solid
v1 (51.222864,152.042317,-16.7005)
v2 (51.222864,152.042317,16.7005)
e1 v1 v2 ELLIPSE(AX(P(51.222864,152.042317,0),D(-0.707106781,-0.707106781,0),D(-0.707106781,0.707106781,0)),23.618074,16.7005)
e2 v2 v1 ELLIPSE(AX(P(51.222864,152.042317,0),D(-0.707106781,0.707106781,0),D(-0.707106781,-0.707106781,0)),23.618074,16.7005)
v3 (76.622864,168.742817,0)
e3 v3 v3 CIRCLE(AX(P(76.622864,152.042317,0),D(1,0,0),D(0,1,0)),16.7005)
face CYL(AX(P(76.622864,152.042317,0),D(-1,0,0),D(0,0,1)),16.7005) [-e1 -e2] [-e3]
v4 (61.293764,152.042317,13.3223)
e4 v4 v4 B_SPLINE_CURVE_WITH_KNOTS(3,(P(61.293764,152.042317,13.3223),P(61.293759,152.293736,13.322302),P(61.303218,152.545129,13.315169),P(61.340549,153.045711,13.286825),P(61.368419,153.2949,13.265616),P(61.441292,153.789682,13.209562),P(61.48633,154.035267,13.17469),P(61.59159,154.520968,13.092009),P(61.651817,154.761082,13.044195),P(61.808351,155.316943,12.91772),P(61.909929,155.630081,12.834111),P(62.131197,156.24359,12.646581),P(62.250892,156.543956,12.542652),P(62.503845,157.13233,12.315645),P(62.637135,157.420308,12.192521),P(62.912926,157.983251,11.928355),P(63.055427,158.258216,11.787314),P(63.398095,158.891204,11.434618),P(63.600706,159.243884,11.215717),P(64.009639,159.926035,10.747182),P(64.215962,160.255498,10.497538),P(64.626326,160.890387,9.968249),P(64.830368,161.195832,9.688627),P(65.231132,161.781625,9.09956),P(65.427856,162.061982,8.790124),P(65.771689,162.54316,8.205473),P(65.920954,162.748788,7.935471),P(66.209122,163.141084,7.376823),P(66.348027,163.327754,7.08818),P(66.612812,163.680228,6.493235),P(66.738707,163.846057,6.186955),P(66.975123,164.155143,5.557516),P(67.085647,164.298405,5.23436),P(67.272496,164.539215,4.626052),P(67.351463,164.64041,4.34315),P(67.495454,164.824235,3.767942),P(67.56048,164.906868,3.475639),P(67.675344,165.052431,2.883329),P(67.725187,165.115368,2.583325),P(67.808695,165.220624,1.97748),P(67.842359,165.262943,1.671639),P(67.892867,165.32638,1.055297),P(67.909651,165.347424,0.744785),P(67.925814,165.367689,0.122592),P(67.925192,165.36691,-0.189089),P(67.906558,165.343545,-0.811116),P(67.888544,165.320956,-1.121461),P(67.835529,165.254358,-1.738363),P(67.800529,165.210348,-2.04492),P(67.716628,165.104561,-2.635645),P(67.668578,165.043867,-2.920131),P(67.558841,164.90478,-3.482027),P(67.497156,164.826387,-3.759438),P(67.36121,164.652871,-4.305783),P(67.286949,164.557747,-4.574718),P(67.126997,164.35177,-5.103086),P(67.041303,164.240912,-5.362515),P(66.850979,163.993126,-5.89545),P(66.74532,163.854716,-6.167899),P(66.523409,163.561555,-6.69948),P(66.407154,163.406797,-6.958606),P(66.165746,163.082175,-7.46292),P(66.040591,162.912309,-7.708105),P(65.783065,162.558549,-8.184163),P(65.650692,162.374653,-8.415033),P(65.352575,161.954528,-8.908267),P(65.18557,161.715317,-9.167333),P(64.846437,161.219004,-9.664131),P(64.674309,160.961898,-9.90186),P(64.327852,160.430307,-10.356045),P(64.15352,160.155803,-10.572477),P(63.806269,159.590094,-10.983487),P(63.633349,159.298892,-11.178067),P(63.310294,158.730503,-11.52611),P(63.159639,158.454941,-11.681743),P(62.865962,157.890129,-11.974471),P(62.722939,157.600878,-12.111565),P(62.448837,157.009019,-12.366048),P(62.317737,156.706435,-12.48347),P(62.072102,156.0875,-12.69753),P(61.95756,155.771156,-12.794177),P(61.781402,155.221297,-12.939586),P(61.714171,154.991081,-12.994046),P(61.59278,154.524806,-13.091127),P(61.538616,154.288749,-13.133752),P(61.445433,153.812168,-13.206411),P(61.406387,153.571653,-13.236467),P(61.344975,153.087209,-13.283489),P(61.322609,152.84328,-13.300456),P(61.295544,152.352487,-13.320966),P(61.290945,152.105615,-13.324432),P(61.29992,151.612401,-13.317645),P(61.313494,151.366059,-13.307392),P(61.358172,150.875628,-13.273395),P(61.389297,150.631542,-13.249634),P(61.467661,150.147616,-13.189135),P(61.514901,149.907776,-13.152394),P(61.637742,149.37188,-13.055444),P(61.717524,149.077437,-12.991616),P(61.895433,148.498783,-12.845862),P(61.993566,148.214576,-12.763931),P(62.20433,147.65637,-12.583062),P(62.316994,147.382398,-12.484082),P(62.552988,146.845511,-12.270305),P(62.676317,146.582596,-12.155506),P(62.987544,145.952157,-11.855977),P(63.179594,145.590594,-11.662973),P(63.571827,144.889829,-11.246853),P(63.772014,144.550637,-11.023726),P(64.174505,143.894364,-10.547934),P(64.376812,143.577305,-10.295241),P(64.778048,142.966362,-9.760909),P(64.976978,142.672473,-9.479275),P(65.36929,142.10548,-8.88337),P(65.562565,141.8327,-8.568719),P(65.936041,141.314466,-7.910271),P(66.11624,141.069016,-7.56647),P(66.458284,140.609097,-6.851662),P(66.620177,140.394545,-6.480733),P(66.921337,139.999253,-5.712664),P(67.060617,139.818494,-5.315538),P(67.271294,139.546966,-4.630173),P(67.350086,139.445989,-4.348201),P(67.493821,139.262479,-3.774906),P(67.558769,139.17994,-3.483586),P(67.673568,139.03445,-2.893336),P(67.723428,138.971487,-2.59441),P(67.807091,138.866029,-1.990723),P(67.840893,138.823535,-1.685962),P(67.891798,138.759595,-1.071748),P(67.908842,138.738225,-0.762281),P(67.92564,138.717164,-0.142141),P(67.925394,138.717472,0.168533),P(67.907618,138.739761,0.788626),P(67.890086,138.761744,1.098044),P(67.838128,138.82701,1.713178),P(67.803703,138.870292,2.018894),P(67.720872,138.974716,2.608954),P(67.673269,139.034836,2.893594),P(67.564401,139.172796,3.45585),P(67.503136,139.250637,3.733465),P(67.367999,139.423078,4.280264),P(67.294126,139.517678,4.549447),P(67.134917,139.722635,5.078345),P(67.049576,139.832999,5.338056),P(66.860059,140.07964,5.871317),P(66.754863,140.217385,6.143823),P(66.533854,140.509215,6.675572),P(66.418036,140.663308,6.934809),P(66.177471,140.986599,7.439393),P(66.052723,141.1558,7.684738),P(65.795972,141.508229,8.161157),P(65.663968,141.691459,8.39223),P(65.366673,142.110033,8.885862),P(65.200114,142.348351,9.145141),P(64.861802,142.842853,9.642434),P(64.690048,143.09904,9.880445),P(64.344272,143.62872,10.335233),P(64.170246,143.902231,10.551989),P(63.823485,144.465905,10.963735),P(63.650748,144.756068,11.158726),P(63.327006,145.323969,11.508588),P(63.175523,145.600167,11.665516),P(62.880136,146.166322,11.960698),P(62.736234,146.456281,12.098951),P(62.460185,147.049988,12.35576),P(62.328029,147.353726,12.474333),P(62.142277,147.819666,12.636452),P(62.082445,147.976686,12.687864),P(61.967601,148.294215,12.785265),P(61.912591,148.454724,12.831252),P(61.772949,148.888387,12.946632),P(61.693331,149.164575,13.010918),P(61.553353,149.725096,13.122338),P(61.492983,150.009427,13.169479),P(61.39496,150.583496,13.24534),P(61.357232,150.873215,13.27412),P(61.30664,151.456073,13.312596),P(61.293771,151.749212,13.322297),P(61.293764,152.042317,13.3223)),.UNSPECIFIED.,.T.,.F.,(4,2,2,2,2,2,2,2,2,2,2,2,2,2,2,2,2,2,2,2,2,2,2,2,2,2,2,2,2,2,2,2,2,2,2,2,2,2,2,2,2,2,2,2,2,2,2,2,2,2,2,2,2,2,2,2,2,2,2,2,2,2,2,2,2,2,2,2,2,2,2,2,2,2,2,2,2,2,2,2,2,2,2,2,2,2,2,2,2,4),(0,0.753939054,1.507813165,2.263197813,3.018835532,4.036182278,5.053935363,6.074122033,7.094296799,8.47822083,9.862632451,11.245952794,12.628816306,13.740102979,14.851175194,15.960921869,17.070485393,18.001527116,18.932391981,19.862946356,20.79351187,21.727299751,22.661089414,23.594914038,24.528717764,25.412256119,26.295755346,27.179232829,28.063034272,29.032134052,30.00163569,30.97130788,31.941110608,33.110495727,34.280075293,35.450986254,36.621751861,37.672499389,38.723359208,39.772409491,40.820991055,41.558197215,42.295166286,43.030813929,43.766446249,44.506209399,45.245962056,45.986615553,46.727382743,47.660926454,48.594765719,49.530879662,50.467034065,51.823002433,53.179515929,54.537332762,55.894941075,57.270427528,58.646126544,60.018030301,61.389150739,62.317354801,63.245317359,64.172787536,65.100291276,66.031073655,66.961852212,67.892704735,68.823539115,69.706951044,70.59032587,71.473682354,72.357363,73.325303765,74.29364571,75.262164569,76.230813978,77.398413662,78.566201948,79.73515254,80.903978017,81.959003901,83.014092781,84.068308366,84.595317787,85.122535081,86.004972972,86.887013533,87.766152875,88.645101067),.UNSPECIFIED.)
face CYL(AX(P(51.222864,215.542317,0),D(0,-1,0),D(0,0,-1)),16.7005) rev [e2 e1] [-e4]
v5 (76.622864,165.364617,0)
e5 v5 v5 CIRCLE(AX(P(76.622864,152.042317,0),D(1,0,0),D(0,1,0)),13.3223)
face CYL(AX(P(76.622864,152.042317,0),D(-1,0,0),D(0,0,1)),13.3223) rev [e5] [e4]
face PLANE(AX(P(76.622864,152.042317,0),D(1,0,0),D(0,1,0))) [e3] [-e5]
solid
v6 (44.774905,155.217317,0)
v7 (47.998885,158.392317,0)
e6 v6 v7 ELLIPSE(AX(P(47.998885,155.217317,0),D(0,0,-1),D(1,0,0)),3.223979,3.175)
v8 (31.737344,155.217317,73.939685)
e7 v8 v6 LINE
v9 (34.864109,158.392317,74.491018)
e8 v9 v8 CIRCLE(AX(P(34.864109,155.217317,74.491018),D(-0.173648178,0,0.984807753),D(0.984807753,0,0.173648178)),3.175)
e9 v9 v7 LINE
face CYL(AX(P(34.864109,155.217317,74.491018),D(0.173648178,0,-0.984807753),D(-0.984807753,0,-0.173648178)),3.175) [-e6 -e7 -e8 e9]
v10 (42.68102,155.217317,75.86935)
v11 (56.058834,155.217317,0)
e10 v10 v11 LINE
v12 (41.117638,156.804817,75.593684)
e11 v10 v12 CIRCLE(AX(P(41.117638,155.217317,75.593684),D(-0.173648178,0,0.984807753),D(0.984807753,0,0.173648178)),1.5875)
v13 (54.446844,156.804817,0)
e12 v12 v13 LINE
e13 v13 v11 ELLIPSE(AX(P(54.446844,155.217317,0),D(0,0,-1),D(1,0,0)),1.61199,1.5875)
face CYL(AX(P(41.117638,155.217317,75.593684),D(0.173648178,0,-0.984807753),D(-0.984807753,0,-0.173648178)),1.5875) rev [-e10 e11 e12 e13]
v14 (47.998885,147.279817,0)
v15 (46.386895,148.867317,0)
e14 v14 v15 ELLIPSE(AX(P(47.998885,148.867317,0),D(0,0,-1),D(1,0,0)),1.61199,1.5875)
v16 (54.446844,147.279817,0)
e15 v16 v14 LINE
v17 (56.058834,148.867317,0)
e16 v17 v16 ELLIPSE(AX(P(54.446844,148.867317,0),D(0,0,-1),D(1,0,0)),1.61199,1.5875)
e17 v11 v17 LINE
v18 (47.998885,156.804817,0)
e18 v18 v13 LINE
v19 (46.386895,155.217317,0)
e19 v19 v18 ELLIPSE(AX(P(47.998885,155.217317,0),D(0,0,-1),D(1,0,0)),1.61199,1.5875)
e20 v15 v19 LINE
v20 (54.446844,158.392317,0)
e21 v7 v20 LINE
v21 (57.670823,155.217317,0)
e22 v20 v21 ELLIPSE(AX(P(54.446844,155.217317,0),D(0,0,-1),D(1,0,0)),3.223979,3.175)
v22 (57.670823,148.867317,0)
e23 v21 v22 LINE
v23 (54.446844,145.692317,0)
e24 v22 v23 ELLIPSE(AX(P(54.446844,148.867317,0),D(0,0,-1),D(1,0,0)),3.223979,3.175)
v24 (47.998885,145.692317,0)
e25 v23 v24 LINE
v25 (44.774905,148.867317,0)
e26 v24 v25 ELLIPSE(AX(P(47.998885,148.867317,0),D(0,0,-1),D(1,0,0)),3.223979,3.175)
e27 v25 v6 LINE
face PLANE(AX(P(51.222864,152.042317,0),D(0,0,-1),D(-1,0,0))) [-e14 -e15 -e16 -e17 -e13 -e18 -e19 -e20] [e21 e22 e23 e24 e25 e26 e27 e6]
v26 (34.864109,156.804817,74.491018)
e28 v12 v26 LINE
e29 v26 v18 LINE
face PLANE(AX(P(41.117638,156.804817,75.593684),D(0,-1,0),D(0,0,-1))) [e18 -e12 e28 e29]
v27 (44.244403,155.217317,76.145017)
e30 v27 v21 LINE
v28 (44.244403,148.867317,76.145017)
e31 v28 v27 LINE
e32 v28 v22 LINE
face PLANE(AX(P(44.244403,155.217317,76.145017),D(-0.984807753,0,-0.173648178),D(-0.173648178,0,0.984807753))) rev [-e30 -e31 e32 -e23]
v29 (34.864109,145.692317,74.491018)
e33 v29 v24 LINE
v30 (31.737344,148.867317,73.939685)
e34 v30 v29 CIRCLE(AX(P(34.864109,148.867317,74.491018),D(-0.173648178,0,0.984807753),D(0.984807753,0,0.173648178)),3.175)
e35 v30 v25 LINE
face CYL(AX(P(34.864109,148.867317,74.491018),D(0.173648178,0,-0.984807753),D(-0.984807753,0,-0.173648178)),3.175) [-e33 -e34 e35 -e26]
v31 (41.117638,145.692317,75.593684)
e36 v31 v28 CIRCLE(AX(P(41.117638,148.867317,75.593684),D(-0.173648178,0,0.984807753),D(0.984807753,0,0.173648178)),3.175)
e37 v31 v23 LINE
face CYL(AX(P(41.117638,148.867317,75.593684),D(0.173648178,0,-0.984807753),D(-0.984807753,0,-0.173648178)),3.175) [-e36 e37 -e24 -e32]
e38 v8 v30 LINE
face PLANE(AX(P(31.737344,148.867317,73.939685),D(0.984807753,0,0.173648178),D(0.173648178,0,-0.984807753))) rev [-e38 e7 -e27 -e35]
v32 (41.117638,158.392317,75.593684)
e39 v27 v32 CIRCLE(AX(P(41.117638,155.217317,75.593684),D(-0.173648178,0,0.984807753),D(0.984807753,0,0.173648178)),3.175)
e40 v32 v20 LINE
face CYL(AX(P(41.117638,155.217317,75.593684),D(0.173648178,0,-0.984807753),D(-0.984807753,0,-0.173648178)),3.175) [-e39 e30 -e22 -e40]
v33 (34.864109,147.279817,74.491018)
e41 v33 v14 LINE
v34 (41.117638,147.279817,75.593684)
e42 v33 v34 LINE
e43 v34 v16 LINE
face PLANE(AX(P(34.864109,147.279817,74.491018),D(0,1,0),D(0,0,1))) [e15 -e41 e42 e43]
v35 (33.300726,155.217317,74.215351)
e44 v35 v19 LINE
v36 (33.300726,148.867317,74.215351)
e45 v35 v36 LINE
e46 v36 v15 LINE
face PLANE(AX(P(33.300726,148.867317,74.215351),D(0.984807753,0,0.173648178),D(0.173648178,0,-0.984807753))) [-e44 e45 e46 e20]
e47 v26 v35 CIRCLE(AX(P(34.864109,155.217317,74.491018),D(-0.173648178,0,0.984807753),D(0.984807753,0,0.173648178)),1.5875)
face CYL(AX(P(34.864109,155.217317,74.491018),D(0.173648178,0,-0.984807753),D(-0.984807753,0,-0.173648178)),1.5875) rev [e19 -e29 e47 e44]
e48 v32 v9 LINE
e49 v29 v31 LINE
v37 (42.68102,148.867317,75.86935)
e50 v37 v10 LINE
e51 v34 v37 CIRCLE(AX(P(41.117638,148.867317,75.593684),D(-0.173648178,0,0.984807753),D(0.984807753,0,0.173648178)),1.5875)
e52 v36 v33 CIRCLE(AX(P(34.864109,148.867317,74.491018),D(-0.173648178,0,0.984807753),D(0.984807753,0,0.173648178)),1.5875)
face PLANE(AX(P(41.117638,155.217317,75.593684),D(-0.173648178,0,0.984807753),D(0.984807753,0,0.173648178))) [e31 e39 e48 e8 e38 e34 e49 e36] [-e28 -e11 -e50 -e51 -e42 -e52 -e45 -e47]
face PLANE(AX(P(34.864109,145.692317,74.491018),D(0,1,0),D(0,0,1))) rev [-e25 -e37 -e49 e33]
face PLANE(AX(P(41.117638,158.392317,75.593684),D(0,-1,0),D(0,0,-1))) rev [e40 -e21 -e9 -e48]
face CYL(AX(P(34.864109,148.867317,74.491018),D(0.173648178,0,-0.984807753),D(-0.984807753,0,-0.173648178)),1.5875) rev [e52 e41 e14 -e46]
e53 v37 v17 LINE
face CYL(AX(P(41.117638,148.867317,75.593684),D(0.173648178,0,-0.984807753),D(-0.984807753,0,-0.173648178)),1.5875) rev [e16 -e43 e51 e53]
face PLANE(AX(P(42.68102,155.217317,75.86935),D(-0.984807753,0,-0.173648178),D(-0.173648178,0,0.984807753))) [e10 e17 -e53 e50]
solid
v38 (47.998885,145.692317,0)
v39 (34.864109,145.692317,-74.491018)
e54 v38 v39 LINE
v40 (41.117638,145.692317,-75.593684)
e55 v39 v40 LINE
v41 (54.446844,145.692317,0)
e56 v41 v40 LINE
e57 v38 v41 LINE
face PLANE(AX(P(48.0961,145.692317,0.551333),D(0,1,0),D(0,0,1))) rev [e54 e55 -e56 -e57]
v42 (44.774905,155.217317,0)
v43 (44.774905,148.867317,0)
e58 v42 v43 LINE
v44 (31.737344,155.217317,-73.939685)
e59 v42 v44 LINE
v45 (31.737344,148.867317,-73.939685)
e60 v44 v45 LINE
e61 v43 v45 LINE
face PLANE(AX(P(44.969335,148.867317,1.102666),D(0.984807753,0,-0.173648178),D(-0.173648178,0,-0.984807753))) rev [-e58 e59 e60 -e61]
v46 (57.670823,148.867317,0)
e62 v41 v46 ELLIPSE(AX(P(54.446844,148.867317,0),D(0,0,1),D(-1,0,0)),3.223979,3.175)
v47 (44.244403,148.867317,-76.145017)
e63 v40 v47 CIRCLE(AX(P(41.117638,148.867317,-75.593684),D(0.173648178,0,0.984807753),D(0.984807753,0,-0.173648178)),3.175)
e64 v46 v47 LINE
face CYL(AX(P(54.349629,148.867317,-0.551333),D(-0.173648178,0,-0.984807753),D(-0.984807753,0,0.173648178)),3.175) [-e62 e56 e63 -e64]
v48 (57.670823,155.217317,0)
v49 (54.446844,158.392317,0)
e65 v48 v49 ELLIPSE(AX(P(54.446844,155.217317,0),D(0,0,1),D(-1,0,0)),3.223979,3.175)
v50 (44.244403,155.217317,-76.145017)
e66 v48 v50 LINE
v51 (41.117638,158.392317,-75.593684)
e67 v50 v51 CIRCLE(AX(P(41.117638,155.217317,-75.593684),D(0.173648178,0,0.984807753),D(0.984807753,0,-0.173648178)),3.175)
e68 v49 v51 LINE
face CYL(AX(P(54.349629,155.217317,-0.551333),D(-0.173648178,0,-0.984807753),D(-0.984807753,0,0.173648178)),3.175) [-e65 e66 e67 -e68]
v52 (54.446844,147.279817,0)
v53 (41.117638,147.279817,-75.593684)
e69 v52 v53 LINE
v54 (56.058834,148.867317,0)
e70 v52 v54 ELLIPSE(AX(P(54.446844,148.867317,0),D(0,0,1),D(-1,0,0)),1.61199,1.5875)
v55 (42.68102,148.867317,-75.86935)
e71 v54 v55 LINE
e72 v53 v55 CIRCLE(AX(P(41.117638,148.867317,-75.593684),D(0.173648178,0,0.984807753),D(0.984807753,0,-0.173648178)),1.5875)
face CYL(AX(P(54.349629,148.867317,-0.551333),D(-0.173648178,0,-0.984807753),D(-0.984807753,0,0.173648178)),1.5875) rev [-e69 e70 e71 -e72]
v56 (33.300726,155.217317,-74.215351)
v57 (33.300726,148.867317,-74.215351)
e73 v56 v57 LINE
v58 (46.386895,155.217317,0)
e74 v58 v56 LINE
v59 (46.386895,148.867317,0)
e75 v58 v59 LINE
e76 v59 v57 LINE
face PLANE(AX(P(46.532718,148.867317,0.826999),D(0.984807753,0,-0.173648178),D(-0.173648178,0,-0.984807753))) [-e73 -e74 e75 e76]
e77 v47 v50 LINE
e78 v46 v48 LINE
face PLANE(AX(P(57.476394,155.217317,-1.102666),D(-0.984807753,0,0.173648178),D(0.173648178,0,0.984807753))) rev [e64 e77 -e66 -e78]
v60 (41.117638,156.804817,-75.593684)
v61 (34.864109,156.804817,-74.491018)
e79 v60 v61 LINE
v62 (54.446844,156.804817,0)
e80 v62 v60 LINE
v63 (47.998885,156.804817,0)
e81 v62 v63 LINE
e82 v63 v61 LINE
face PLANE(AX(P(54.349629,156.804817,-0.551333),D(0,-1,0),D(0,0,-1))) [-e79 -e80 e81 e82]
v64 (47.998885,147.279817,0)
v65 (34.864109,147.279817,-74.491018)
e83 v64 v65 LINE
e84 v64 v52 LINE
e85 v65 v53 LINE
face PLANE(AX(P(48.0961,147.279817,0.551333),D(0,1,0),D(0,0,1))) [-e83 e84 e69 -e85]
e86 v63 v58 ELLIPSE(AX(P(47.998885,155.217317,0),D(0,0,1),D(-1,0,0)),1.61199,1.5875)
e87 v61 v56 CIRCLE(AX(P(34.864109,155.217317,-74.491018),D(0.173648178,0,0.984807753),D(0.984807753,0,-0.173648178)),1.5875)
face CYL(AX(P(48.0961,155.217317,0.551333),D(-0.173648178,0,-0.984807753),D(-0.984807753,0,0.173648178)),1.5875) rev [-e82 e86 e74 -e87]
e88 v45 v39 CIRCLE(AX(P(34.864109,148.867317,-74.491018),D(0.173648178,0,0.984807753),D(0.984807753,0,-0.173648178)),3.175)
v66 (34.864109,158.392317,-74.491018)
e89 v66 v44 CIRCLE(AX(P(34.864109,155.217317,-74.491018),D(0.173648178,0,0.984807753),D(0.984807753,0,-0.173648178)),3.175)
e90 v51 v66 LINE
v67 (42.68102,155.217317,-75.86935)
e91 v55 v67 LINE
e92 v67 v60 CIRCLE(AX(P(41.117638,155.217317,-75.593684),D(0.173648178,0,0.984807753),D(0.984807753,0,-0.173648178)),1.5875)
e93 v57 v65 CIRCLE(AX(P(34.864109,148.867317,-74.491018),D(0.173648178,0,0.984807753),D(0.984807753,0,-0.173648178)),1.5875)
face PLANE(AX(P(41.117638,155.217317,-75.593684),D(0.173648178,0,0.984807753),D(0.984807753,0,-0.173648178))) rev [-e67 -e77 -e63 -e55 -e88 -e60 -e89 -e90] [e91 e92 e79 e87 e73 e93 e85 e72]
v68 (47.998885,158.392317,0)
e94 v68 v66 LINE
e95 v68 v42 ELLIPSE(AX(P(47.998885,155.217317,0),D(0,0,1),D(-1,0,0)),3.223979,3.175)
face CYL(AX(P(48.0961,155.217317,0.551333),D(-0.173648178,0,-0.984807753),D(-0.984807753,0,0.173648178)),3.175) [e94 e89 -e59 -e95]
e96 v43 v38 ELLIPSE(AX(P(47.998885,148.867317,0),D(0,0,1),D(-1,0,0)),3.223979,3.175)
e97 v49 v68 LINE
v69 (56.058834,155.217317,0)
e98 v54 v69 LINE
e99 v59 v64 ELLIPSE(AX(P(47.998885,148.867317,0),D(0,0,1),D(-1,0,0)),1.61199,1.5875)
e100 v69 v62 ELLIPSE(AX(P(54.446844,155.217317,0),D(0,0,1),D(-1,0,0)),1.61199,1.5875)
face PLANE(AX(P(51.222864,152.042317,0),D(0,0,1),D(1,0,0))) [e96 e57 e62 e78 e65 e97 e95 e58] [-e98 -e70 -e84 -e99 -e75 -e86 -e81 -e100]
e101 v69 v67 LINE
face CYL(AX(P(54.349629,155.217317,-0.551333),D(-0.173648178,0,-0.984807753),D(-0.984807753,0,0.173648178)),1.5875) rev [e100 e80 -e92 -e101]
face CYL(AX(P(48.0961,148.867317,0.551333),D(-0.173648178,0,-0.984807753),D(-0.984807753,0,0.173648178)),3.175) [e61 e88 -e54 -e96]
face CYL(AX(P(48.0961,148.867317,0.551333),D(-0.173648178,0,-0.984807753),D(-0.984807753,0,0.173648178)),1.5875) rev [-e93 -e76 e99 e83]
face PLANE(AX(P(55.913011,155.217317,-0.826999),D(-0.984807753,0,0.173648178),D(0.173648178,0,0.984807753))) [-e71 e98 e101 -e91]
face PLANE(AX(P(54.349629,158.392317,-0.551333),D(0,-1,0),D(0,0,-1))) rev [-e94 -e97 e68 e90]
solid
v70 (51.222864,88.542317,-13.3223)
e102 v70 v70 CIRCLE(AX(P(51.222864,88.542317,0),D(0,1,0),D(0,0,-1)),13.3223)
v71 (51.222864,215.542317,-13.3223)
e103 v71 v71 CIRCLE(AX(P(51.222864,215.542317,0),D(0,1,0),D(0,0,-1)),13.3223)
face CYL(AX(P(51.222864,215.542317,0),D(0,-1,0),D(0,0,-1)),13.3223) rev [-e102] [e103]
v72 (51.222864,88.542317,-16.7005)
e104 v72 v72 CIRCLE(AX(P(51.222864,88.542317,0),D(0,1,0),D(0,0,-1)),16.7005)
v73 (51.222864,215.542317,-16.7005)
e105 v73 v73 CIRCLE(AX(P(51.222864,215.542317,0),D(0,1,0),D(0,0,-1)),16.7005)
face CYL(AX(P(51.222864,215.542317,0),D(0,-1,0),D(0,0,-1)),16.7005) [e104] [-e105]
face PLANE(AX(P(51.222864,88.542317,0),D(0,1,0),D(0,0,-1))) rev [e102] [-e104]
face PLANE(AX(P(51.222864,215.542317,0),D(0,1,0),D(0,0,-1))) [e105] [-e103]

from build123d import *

# Parameters (mm, degrees)
STRUCTURAL_START                 = 51.22286437
STRUCTURAL_MEMBER1_OUTLINE_R     = 16.7005
STRUCTURAL_MEMBER1_OUTLINE_R_2   = 13.3223
STRUCTURAL_MEMBER1_DEPTH         = 25.4000001
STRUCTURAL_START_2               = 134
STRUCTURAL_MEMBER1_2_DEPTH       = 36
STRUCTURAL_START_3               = 88.54231741
STRUCTURAL_MEMBER1_3_OUTLINE_R   = 16.7005
STRUCTURAL_MEMBER1_3_OUTLINE_R_2 = 13.3223
STRUCTURAL_MEMBER1_3_DEPTH       = 127
STRUCTURAL_MEMBER2_DEPTH         = 78.783461448
STRUCTURAL_MEMBER2_2_DEPTH       = 76.2
STRUCTURAL_MEMBER2_2_DEPTH_BACK  = 2.583461448


with BuildPart() as part:
    # Structural Member1: read off the stored shape, not the designer's step
    # Structural Member1 outline → Structural Member1 (new body)
    with BuildSketch(Plane.YZ.offset(STRUCTURAL_START)):
        with Locations((152.04231741, 0)):
            Circle(STRUCTURAL_MEMBER1_OUTLINE_R)
        with Locations((152.04231741, 0)):
            Circle(STRUCTURAL_MEMBER1_OUTLINE_R_2, mode=Mode.SUBTRACT)
    extrude(amount=STRUCTURAL_MEMBER1_DEPTH)

    # Structural Member1 2 outline → Structural Member1 2 (cut)
    with BuildSketch(Plane(origin=(0, 0, 0), x_dir=(1, 0, 0), z_dir=(0, 1, 0)).offset(STRUCTURAL_START_2)):
        with BuildLine():
            ThreePointArc((51.22286447, -16.7005), (67.92336447, 0), (51.22286447, 16.7005))
            Line((51.22286447, 16.7005), (51.22286447, -16.7005))
        make_face()
    extrude(amount=STRUCTURAL_MEMBER1_2_DEPTH, mode=Mode.SUBTRACT)


with BuildPart() as body_2:
    # Structural Member1 3 outline → Structural Member1 3 (new body)
    with BuildSketch(Plane(origin=(0, 0, 0), x_dir=(1, 0, 0), z_dir=(0, 1, 0)).offset(STRUCTURAL_START_3)):
        with Locations((51.22286447, 0)):
            Circle(STRUCTURAL_MEMBER1_3_OUTLINE_R)
        with Locations((51.22286447, 0)):
            Circle(STRUCTURAL_MEMBER1_3_OUTLINE_R_2, mode=Mode.SUBTRACT)
    extrude(amount=STRUCTURAL_MEMBER1_3_DEPTH)


with BuildPart() as body_3:
    # Sketch1 on segment 1 (carried to segment 1) → Structural Member2 (new body)
    with BuildSketch(Plane(origin=(37.990873332, 152.04231741, -75.04235078), x_dir=(0.984807753, 0, -0.173648178), z_dir=(0.173648178, 0, 0.984807753))):
        with BuildLine():
            Line((-3.175, -6.35), (3.175, -6.35))
            ThreePointArc((3.175, -6.35), (5.42006403, -5.42006403), (6.35, -3.175))
            Line((6.35, -3.175), (6.35, 3.175))
            ThreePointArc((6.35, 3.175), (5.42006403, 5.42006403), (3.175, 6.35))
            Line((3.175, 6.35), (-3.175, 6.35))
            ThreePointArc((-3.175, 6.35), (-5.42006403, 5.42006403), (-6.35, 3.175))
            Line((-6.35, 3.175), (-6.35, -3.175))
            ThreePointArc((-6.35, -3.175), (-5.42006403, -5.42006403), (-3.175, -6.35))
        make_face()
        with BuildLine():
            Line((-3.175, -4.7625), (3.175, -4.7625))
            ThreePointArc((3.175, -4.7625), (4.297532015, -4.297532015), (4.7625, -3.175))
            Line((4.7625, -3.175), (4.7625, 3.175))
            ThreePointArc((4.7625, 3.175), (4.297532015, 4.297532015), (3.175, 4.7625))
            Line((3.175, 4.7625), (-3.175, 4.7625))
            ThreePointArc((-3.175, 4.7625), (-4.297532015, 4.297532015), (-4.7625, 3.175))
            Line((-4.7625, 3.175), (-4.7625, -3.175))
            ThreePointArc((-4.7625, -3.175), (-4.297532015, -4.297532015), (-3.175, -4.7625))
        make_face(mode=Mode.SUBTRACT)
    extrude(amount=STRUCTURAL_MEMBER2_DEPTH)

    # Structural Member2 mitre 1
    split(bisect_by=Plane(origin=(51.22286447, 152.04231741, 0), x_dir=(0, 1, 0), z_dir=(0, 0, -1)), keep=Keep.TOP)


with BuildPart() as body_4:
    # Sketch1 → Structural Member2 2 (new, two sides: drawn at the far end of the back side and taken through both)
    with BuildSketch(Plane(origin=(51.22286447, 152.04231741, 0), x_dir=(0.9848077530122076, 0, 0.17364817766693402), z_dir=(-0.17364817766693402, 0, 0.9848077530122076)).offset(-STRUCTURAL_MEMBER2_2_DEPTH_BACK)):
        with BuildLine():
            Line((-3.175, -6.35), (3.175, -6.35))
            ThreePointArc((3.175, -6.35), (5.42006403, -5.42006403), (6.35, -3.175))
            Line((6.35, -3.175), (6.35, 3.175))
            ThreePointArc((6.35, 3.175), (5.42006403, 5.42006403), (3.175, 6.35))
            Line((3.175, 6.35), (-3.175, 6.35))
            ThreePointArc((-3.175, 6.35), (-5.42006403, 5.42006403), (-6.35, 3.175))
            Line((-6.35, 3.175), (-6.35, -3.175))
            ThreePointArc((-6.35, -3.175), (-5.42006403, -5.42006403), (-3.175, -6.35))
        make_face()
        with BuildLine():
            Line((-3.175, -4.7625), (3.175, -4.7625))
            ThreePointArc((3.175, -4.7625), (4.297532015, -4.297532015), (4.7625, -3.175))
            Line((4.7625, -3.175), (4.7625, 3.175))
            ThreePointArc((4.7625, 3.175), (4.297532015, 4.297532015), (3.175, 4.7625))
            Line((3.175, 4.7625), (-3.175, 4.7625))
            ThreePointArc((-3.175, 4.7625), (-4.297532015, 4.297532015), (-4.7625, 3.175))
            Line((-4.7625, 3.175), (-4.7625, -3.175))
            ThreePointArc((-4.7625, -3.175), (-4.297532015, -4.297532015), (-3.175, -4.7625))
        make_face(mode=Mode.SUBTRACT)
    extrude(amount=STRUCTURAL_MEMBER2_2_DEPTH + STRUCTURAL_MEMBER2_2_DEPTH_BACK)

    # Structural Member2 2 mitre 1
    split(bisect_by=Plane(origin=(51.22286447, 152.04231741, 0), x_dir=(0, -1, 0), z_dir=(0, 0, 1)), keep=Keep.TOP)


solid = Compound([part.part, body_2.part, body_3.part, body_4.part])
